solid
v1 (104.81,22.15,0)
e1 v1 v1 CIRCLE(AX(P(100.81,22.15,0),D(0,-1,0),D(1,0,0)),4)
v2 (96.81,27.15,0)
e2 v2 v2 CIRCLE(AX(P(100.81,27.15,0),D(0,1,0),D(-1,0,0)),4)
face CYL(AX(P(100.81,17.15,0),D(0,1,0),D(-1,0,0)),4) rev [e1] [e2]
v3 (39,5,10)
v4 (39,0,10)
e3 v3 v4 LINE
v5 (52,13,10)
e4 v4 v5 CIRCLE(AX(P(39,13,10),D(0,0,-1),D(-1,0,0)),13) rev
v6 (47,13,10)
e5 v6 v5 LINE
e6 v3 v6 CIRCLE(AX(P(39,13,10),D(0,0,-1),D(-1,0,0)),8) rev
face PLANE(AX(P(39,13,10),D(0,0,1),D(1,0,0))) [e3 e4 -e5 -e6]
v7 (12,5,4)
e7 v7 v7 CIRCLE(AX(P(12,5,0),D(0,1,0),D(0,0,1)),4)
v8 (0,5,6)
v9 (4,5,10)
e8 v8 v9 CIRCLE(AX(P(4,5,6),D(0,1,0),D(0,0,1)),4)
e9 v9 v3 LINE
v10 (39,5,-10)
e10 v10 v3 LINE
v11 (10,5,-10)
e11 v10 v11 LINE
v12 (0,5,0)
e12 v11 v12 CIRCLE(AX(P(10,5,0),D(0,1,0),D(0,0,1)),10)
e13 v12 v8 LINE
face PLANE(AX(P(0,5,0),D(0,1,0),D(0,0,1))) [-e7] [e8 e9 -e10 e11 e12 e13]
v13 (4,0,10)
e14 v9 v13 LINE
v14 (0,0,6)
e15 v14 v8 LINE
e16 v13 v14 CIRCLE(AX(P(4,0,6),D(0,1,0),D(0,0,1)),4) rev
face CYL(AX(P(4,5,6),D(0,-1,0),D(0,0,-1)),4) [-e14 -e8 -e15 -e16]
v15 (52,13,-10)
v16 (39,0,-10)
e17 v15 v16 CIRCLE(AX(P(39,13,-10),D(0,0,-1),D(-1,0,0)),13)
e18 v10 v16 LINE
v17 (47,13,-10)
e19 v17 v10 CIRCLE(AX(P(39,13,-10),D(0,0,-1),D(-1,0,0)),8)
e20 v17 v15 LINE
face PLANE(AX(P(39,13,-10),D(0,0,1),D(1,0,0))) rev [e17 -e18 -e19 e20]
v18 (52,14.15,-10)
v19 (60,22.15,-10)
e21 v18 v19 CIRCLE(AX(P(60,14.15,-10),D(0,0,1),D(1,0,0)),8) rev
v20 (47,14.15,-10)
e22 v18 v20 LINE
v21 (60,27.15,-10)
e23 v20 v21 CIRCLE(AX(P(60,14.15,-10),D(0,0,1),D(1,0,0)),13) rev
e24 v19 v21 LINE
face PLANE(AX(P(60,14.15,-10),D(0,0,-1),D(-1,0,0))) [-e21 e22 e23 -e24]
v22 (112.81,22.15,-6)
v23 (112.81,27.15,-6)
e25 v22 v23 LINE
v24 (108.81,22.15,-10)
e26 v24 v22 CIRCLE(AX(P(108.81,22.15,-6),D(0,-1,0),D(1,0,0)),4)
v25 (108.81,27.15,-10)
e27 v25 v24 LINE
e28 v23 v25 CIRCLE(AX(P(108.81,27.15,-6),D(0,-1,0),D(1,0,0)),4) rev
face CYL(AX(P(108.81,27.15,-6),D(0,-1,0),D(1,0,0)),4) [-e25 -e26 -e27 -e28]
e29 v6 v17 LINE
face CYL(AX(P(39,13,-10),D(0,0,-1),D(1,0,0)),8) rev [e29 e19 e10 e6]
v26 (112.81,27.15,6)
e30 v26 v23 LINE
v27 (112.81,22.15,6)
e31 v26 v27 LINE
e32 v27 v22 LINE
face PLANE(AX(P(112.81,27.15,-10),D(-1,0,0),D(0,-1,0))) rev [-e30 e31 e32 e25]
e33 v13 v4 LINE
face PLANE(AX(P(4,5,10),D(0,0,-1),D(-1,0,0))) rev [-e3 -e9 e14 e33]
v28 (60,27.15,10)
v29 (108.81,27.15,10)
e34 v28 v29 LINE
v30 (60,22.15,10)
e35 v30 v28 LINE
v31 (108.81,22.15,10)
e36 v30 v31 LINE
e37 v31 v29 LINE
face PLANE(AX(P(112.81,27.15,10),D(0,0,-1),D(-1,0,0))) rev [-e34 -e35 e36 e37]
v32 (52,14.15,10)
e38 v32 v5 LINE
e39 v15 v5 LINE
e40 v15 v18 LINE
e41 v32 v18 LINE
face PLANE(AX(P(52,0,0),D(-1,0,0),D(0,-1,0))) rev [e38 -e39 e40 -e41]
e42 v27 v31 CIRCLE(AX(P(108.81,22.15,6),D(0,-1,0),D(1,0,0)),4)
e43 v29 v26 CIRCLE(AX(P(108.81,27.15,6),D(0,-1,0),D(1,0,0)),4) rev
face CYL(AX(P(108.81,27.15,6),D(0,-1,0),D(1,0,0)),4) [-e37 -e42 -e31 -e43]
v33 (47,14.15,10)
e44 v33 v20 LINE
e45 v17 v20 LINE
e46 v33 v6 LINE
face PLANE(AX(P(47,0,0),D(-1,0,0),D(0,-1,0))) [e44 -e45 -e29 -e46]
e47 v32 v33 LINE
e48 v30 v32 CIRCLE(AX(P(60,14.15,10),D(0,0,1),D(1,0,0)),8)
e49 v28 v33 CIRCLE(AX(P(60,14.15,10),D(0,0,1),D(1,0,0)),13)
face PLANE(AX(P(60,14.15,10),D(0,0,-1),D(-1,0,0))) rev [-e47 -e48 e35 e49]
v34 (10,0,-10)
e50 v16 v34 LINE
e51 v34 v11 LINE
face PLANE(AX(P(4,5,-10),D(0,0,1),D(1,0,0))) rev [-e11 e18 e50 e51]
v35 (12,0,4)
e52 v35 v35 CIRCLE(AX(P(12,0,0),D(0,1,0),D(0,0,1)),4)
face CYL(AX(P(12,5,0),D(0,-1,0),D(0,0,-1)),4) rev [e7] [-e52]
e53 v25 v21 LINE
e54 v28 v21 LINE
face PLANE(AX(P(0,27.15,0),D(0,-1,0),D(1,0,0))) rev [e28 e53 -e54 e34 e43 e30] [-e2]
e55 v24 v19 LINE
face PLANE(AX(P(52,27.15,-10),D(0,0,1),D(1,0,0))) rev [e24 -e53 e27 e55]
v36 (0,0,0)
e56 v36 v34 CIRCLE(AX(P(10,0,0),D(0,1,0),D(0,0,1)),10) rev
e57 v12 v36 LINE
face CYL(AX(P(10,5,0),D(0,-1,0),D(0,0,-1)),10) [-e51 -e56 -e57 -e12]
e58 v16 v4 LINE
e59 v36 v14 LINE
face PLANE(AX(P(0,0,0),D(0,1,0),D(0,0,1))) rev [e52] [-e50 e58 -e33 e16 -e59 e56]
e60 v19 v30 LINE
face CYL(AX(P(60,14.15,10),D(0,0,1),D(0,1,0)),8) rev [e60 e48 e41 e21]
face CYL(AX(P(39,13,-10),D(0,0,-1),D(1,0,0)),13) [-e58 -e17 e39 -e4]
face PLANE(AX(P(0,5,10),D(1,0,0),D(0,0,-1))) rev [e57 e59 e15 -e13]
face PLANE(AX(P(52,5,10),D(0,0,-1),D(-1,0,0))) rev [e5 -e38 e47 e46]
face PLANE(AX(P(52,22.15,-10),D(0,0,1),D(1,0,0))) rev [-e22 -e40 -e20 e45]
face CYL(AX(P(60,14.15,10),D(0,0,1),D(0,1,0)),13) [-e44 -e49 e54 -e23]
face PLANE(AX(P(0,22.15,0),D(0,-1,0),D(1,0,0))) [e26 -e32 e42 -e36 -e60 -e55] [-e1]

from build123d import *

# Parameters (mm, degrees)
SKETCH1_R                    = 4
BASE_FLANGE1_DEPTH           = 5
EDGE_FLANGE1_STRIP_W         = 36
EDGE_FLANGE1_STRIP_H         = 5
EDGE_FLANGE1_STRIP_CUT_DEPTH = 20
EDGE_FLANGE1_DEPTH           = 20
EDGE_FLANGE2_STRIP_W         = 36
EDGE_FLANGE2_STRIP_H         = 5
EDGE_FLANGE2_STRIP_CUT_DEPTH = 20
EDGE_FLANGE2_DEPTH           = 20
SKETCH14_R                   = 4
CUT_EXTRUDE1_DEPTH           = 10
FILLET1_R                    = 4
FILLET3_R                    = 4
FILLET4_R                    = 10


# Sheet-metal steps are written as plain solids
with BuildPart() as part:
    # Sketch1 → Base-Flange1 (new body)
    with BuildSketch(Plane(origin=(0, 0, 0), x_dir=(1, 0, 0), z_dir=(0, 1, 0))):
        Polygon((4, 10), (0, 10), (0, 6), (0, -6), (0, -10), (4, -10), (47, -10), (47, 10), align=None)
        with Locations(Location((12, 0, 0), (0, 0, 270))):
            Circle(SKETCH1_R, mode=Mode.SUBTRACT)
    extrude(amount=BASE_FLANGE1_DEPTH)

    # Edge-Flange1 strip (across the edge) → Edge-Flange1 strip cut (cut)
    with BuildSketch(Plane(origin=(47, 5, 10), x_dir=(-1, 0, 0), z_dir=(0, 0, -1))):
        with Locations((-10, -2.5)):
            Rectangle(EDGE_FLANGE1_STRIP_W, EDGE_FLANGE1_STRIP_H)
    extrude(amount=EDGE_FLANGE1_STRIP_CUT_DEPTH, mode=Mode.SUBTRACT)

    # Edge-Flange1 section (across the edge) → Edge-Flange1 (add)
    with BuildSketch(Plane(origin=(47, 5, 10), x_dir=(-1, 0, 0), z_dir=(0, 0, -1))):
        with BuildLine():
            Line((-5, 8), (-5, 17.15))
            Line((-5, 17.15), (0, 17.15))
            Line((0, 17.15), (0, 8))
            ThreePointArc((0, 8), (2.343145751, 2.343145751), (8, 0))
            Line((8, 0), (8, -5))
            ThreePointArc((8, -5), (-1.192388155, -1.192388155), (-5, 8))
        make_face()
    extrude(amount=EDGE_FLANGE1_DEPTH)

    # Edge-Flange2 strip (across the edge) → Edge-Flange2 strip cut (cut)
    with BuildSketch(Plane(origin=(52, 22.15, -10), x_dir=(0, -1, 0), z_dir=(0, 0, 1))):
        with Locations((-10, -2.5)):
            Rectangle(EDGE_FLANGE2_STRIP_W, EDGE_FLANGE2_STRIP_H)
    extrude(amount=EDGE_FLANGE2_STRIP_CUT_DEPTH, mode=Mode.SUBTRACT)

    # Edge-Flange2 section (across the edge) → Edge-Flange2 (add)
    with BuildSketch(Plane(origin=(52, 22.15, -10), x_dir=(0, -1, 0), z_dir=(0, 0, 1))):
        with BuildLine():
            Line((-5, 8), (-5, 60.81))
            Line((-5, 60.81), (0, 60.81))
            Line((0, 60.81), (0, 8))
            ThreePointArc((0, 8), (2.343145751, 2.343145751), (8, 0))
            Line((8, 0), (8, -5))
            ThreePointArc((8, -5), (-1.192388155, -1.192388155), (-5, 8))
        make_face()
    extrude(amount=EDGE_FLANGE2_DEPTH)

    # Sketch14 → Cut-Extrude1 (cut)
    with BuildSketch(Plane(origin=(0, 27.15, 0), x_dir=(1, 0, 0), z_dir=(0, 1, 0))):
        with Locations(Location((100.81, 0, 0), (0, 0, 180))):
            Circle(SKETCH14_R)
    extrude(amount=-CUT_EXTRUDE1_DEPTH, mode=Mode.SUBTRACT)

    # Fillet1
    fillet1_edges = [part.edges().sort_by_distance(p)[0] for p in [
        (112.81, 24.65, -10),
        (112.81, 24.65, 10),
    ]]
    fillet(fillet1_edges, radius=FILLET1_R)

    # Fillet3
    fillet3_edges = [part.edges().sort_by_distance(p)[0] for p in [
        (0, 2.5, 10),
    ]]
    fillet(fillet3_edges, radius=FILLET3_R)

    # Fillet4
    fillet4_edges = [part.edges().sort_by_distance(p)[0] for p in [
        (0, 2.5, -10),
    ]]
    fillet(fillet4_edges, radius=FILLET4_R)


solid = part.part
